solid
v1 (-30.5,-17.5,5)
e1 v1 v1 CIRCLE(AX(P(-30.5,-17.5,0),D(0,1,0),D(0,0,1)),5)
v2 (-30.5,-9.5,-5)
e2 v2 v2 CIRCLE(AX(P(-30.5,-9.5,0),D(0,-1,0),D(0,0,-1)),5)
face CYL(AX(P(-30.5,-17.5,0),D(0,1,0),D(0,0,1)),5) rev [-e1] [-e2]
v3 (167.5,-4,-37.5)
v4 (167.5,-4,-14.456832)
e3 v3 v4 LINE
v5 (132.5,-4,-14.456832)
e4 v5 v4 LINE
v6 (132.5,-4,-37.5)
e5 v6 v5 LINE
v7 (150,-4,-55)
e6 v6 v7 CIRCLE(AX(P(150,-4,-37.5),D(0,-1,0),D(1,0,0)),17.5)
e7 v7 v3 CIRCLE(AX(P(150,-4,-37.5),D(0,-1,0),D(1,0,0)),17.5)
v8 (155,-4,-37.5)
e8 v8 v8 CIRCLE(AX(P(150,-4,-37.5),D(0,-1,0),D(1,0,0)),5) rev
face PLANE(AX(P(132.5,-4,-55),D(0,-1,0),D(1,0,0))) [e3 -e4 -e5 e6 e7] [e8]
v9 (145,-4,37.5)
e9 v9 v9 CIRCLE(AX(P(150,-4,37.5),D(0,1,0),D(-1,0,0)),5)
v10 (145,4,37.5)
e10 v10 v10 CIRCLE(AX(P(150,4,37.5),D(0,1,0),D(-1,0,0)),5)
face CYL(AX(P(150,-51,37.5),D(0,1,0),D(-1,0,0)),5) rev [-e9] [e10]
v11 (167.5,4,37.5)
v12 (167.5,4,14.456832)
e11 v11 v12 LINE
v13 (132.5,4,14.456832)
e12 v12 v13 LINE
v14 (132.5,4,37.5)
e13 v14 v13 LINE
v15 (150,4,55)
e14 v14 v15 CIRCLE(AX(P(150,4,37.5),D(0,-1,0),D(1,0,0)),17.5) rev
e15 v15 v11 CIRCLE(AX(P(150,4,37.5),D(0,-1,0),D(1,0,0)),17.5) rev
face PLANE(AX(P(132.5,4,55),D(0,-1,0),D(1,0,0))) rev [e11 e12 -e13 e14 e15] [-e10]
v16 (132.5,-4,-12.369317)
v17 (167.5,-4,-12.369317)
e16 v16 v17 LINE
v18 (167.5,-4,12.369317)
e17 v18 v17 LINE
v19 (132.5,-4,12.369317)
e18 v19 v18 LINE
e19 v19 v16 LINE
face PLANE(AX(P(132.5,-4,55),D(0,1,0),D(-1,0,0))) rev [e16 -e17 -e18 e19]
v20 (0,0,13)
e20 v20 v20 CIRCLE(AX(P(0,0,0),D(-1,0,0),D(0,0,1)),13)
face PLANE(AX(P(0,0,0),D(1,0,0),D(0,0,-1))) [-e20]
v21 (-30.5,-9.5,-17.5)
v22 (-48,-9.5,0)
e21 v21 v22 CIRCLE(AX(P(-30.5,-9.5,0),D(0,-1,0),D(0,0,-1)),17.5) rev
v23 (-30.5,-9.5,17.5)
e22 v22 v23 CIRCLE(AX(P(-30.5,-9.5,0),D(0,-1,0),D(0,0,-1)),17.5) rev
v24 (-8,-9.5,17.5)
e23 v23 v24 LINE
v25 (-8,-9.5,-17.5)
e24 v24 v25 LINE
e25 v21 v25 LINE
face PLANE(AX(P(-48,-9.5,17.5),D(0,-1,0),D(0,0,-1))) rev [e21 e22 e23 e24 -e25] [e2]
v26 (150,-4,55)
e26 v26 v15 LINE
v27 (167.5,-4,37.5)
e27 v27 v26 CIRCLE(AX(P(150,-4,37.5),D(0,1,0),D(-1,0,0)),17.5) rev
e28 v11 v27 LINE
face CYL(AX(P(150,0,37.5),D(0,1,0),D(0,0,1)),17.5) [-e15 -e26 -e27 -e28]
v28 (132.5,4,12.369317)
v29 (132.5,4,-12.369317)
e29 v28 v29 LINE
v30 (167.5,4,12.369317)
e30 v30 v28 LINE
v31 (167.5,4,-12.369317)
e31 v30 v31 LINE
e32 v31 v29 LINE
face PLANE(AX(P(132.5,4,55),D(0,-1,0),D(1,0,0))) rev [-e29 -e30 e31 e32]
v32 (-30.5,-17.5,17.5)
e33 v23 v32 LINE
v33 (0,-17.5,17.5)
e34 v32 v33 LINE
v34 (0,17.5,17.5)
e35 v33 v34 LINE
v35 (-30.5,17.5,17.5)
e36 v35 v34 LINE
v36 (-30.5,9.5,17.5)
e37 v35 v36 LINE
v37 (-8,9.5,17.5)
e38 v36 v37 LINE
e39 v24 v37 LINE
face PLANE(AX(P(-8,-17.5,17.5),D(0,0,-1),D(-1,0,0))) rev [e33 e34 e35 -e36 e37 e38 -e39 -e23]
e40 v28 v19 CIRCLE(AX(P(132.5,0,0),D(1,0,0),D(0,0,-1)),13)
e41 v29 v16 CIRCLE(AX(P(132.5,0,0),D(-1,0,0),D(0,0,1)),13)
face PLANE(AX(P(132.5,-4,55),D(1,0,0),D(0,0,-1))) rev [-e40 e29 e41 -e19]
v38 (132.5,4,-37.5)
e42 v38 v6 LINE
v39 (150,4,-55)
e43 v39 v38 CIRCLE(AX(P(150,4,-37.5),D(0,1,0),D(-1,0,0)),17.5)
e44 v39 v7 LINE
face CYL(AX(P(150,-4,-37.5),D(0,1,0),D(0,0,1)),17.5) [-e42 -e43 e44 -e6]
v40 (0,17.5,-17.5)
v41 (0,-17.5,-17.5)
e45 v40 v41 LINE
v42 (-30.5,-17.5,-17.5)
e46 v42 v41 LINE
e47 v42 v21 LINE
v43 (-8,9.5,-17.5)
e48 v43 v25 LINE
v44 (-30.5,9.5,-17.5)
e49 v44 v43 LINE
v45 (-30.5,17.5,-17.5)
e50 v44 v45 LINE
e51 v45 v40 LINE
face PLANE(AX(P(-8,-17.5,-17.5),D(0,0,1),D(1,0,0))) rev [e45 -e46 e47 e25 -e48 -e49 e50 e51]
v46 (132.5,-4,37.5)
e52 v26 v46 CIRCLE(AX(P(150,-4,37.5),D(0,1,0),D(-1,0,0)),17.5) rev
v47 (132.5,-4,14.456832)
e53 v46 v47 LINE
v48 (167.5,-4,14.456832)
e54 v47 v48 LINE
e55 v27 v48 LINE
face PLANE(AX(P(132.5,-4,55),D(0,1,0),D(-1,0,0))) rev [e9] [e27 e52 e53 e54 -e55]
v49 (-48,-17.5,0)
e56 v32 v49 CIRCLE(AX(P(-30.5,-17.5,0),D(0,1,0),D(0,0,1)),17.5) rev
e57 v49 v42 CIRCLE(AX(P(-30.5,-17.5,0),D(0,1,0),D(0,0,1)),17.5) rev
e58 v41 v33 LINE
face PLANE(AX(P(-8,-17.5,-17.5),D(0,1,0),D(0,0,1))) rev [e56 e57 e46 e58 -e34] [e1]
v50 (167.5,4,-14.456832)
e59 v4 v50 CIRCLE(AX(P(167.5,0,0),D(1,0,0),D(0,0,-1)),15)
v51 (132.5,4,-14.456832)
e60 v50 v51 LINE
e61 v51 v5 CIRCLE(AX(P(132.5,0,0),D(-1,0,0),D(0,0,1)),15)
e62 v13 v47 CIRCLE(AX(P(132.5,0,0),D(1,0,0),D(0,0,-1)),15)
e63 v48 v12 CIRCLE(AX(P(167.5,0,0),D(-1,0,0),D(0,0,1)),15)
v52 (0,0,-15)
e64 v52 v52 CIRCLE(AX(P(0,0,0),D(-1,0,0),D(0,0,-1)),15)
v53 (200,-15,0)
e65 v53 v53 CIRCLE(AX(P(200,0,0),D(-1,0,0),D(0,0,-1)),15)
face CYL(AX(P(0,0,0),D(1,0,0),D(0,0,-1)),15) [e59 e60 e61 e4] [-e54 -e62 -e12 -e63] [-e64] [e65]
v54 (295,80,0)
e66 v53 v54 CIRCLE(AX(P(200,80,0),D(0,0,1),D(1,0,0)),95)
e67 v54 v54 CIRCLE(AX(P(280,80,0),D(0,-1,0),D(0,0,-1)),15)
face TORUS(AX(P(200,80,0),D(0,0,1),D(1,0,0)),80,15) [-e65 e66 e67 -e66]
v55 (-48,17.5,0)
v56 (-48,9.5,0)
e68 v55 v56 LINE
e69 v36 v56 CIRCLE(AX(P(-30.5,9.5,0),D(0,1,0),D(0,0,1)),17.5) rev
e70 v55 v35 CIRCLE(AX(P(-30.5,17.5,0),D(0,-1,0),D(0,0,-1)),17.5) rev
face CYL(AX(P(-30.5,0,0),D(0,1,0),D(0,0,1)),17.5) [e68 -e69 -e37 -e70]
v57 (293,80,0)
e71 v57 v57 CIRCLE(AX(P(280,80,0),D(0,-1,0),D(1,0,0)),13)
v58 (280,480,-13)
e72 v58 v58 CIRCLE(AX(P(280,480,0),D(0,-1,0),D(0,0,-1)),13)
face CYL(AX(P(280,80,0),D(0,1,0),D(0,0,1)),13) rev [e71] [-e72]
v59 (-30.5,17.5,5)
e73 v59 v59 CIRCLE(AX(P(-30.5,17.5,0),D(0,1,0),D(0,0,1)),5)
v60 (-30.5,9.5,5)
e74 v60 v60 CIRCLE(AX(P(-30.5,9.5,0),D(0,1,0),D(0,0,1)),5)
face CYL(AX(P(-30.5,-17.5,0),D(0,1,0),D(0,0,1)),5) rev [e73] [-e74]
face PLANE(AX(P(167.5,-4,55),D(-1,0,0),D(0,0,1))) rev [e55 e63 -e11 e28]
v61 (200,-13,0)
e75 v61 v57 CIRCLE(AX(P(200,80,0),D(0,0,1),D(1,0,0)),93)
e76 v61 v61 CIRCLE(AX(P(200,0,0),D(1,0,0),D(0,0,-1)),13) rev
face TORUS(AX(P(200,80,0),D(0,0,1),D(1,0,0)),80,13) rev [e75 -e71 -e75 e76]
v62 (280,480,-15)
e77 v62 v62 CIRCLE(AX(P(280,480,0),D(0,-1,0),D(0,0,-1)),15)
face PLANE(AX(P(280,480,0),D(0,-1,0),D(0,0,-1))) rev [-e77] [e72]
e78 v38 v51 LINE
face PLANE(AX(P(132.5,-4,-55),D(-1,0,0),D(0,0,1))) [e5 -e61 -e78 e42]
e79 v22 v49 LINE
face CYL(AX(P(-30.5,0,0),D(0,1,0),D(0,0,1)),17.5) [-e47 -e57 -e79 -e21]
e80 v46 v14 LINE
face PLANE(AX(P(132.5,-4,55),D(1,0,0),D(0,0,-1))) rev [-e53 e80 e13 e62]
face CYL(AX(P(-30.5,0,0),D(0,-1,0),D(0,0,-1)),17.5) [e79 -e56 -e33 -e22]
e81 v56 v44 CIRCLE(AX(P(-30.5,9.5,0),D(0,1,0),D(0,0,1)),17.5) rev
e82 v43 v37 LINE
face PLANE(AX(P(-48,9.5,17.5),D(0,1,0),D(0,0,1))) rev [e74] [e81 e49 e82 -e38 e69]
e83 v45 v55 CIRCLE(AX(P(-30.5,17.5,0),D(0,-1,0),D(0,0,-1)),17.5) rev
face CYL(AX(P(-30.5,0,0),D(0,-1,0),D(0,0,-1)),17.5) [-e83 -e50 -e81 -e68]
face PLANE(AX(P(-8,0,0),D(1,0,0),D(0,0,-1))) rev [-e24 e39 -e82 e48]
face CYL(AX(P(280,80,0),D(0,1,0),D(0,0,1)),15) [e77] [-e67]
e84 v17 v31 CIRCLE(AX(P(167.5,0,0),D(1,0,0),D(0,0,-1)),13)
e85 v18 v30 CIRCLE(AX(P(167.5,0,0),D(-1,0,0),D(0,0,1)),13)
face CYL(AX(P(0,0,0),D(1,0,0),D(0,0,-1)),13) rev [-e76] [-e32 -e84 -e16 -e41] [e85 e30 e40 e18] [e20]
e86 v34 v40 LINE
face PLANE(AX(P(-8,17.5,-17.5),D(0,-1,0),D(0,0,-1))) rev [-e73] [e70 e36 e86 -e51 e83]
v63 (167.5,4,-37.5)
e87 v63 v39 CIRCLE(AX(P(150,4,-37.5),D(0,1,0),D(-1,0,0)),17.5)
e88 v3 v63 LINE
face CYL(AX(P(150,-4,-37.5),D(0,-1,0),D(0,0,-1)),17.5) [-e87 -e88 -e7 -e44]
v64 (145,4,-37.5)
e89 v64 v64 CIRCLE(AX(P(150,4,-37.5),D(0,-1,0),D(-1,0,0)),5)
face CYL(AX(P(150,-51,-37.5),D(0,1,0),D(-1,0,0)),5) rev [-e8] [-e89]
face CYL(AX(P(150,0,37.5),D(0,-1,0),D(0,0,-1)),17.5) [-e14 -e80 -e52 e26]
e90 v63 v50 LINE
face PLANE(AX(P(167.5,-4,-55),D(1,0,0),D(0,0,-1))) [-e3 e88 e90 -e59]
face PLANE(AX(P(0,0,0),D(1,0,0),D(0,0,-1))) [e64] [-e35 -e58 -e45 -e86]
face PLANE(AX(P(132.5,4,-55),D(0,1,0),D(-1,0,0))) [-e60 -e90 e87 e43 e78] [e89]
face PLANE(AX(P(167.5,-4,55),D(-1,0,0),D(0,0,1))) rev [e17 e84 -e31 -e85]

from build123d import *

# Parameters (mm, degrees)
SWEEP_THIN3_PROFILE_R   = 15
SWEEP_THIN3_PROFILE_R_2 = 13
SKETCH57_W              = 35
SKETCH57_H              = 35
BOSS_EXTRUDE1_DEPTH     = 8
SKETCH58_W              = 35
SKETCH58_H              = 8
BOSS_EXTRUDE2_DEPTH     = 40
FILLET1_R               = 17.5
SKETCH59_R              = 5
CUT_EXTRUDE1_DEPTH      = 549.85107275
SKETCH60_W              = 35
SKETCH60_H              = 8
BOSS_EXTRUDE3_DEPTH     = 55
FILLET2_R               = 17.5
SKETCH61_R              = 5
CUT_EXTRUDE2_DEPTH      = 55
FILLET2_OF_MIRROR1_R    = 17.5


with BuildPart() as part:
    # Sweep-Thin3: sweep along a path in Sketch44
    with BuildLine(Plane.XY) as sweep_thin3_path:
        Line((0, 0), (200, 0))
        ThreePointArc((200, 0), (256.568542495, 23.431457505), (280, 80))
        Line((280, 80), (280, 480))
    # Sweep-Thin3 profile (on start of the path) → Sweep-Thin3 (sweep)
    with BuildSketch(Plane(origin=(0, 0, 0), x_dir=(0, 0, 1), z_dir=(1, 0, 0))):
        Circle(SWEEP_THIN3_PROFILE_R)
        Circle(SWEEP_THIN3_PROFILE_R_2, mode=Mode.SUBTRACT)
    sweep(path=sweep_thin3_path.line)

    # Sketch57 → Boss-Extrude1 (add)
    with BuildSketch(Plane.ZY):
        Rectangle(SKETCH57_W, SKETCH57_H)
    extrude(amount=BOSS_EXTRUDE1_DEPTH)

    # Sketch58 → Boss-Extrude2 (add)
    with BuildSketch(Plane.ZY.offset(8)):
        with Locations((0, 13.5)):
            Rectangle(SKETCH58_W, SKETCH58_H)
        with Locations((0, -13.5)):
            Rectangle(SKETCH58_W, SKETCH58_H)
    extrude(amount=BOSS_EXTRUDE2_DEPTH)

    # Fillet1
    fillet1_edges = [part.edges().sort_by_distance(p)[0] for p in [
        (-48, -13.5, 17.5),
        (-48, -13.5, -17.5),
        (-48, 13.5, 17.5),
        (-48, 13.5, -17.5),
    ]]
    fillet(fillet1_edges, radius=FILLET1_R - 0.0001)  # a hair under: the kernel refuses the full size

    # Sketch59 → Cut-Extrude1 (cut, through all)
    with BuildSketch(Plane(origin=(0, 17.5, 0), x_dir=(1, 0, 0), z_dir=(0, 1, 0))):
        with Locations(Location((-30.5, 0, 0), (0, 0, 270))):
            Circle(SKETCH59_R)
    extrude(amount=-CUT_EXTRUDE1_DEPTH, mode=Mode.SUBTRACT)

    # Sketch60 → Boss-Extrude3 (add)
    with BuildSketch(Plane.XY):
        with Locations((150, 0)):
            Rectangle(SKETCH60_W, SKETCH60_H)
    boss_extrude3 = extrude(amount=BOSS_EXTRUDE3_DEPTH)

    # Fillet2
    fillet2_edges = [part.edges().sort_by_distance(p)[0] for p in [
        (132.5, 0, 55),
        (167.5, 0, 55),
    ]]
    fillet(fillet2_edges, radius=FILLET2_R - 0.0001)  # a hair under: the kernel refuses the full size

    # Sketch61 → Cut-Extrude2 (cut)
    with BuildSketch(Plane(origin=(0, 4, 0), x_dir=(1, 0, 0), z_dir=(0, 1, 0))):
        with Locations(Location((150, -37.5, 0), (0, 0, 180))):
            Circle(SKETCH61_R)
    cut_extrude2 = extrude(amount=-CUT_EXTRUDE2_DEPTH, mode=Mode.SUBTRACT)

    # Mirror1: Boss-Extrude3, Cut-Extrude2 across plane
    add(boss_extrude3.mirror(Plane.XY))
    add(cut_extrude2.mirror(Plane.XY), mode=Mode.SUBTRACT)

    # Fillet2 of Mirror1
    fillet2_of_mirror1_edges = [part.edges().sort_by_distance(p)[0] for p in [
        (132.5, 0, -55),
        (167.5, 0, -55),
    ]]
    fillet(fillet2_of_mirror1_edges, radius=FILLET2_OF_MIRROR1_R - 0.0001)  # a hair under: the kernel refuses the full size


solid = part.part
